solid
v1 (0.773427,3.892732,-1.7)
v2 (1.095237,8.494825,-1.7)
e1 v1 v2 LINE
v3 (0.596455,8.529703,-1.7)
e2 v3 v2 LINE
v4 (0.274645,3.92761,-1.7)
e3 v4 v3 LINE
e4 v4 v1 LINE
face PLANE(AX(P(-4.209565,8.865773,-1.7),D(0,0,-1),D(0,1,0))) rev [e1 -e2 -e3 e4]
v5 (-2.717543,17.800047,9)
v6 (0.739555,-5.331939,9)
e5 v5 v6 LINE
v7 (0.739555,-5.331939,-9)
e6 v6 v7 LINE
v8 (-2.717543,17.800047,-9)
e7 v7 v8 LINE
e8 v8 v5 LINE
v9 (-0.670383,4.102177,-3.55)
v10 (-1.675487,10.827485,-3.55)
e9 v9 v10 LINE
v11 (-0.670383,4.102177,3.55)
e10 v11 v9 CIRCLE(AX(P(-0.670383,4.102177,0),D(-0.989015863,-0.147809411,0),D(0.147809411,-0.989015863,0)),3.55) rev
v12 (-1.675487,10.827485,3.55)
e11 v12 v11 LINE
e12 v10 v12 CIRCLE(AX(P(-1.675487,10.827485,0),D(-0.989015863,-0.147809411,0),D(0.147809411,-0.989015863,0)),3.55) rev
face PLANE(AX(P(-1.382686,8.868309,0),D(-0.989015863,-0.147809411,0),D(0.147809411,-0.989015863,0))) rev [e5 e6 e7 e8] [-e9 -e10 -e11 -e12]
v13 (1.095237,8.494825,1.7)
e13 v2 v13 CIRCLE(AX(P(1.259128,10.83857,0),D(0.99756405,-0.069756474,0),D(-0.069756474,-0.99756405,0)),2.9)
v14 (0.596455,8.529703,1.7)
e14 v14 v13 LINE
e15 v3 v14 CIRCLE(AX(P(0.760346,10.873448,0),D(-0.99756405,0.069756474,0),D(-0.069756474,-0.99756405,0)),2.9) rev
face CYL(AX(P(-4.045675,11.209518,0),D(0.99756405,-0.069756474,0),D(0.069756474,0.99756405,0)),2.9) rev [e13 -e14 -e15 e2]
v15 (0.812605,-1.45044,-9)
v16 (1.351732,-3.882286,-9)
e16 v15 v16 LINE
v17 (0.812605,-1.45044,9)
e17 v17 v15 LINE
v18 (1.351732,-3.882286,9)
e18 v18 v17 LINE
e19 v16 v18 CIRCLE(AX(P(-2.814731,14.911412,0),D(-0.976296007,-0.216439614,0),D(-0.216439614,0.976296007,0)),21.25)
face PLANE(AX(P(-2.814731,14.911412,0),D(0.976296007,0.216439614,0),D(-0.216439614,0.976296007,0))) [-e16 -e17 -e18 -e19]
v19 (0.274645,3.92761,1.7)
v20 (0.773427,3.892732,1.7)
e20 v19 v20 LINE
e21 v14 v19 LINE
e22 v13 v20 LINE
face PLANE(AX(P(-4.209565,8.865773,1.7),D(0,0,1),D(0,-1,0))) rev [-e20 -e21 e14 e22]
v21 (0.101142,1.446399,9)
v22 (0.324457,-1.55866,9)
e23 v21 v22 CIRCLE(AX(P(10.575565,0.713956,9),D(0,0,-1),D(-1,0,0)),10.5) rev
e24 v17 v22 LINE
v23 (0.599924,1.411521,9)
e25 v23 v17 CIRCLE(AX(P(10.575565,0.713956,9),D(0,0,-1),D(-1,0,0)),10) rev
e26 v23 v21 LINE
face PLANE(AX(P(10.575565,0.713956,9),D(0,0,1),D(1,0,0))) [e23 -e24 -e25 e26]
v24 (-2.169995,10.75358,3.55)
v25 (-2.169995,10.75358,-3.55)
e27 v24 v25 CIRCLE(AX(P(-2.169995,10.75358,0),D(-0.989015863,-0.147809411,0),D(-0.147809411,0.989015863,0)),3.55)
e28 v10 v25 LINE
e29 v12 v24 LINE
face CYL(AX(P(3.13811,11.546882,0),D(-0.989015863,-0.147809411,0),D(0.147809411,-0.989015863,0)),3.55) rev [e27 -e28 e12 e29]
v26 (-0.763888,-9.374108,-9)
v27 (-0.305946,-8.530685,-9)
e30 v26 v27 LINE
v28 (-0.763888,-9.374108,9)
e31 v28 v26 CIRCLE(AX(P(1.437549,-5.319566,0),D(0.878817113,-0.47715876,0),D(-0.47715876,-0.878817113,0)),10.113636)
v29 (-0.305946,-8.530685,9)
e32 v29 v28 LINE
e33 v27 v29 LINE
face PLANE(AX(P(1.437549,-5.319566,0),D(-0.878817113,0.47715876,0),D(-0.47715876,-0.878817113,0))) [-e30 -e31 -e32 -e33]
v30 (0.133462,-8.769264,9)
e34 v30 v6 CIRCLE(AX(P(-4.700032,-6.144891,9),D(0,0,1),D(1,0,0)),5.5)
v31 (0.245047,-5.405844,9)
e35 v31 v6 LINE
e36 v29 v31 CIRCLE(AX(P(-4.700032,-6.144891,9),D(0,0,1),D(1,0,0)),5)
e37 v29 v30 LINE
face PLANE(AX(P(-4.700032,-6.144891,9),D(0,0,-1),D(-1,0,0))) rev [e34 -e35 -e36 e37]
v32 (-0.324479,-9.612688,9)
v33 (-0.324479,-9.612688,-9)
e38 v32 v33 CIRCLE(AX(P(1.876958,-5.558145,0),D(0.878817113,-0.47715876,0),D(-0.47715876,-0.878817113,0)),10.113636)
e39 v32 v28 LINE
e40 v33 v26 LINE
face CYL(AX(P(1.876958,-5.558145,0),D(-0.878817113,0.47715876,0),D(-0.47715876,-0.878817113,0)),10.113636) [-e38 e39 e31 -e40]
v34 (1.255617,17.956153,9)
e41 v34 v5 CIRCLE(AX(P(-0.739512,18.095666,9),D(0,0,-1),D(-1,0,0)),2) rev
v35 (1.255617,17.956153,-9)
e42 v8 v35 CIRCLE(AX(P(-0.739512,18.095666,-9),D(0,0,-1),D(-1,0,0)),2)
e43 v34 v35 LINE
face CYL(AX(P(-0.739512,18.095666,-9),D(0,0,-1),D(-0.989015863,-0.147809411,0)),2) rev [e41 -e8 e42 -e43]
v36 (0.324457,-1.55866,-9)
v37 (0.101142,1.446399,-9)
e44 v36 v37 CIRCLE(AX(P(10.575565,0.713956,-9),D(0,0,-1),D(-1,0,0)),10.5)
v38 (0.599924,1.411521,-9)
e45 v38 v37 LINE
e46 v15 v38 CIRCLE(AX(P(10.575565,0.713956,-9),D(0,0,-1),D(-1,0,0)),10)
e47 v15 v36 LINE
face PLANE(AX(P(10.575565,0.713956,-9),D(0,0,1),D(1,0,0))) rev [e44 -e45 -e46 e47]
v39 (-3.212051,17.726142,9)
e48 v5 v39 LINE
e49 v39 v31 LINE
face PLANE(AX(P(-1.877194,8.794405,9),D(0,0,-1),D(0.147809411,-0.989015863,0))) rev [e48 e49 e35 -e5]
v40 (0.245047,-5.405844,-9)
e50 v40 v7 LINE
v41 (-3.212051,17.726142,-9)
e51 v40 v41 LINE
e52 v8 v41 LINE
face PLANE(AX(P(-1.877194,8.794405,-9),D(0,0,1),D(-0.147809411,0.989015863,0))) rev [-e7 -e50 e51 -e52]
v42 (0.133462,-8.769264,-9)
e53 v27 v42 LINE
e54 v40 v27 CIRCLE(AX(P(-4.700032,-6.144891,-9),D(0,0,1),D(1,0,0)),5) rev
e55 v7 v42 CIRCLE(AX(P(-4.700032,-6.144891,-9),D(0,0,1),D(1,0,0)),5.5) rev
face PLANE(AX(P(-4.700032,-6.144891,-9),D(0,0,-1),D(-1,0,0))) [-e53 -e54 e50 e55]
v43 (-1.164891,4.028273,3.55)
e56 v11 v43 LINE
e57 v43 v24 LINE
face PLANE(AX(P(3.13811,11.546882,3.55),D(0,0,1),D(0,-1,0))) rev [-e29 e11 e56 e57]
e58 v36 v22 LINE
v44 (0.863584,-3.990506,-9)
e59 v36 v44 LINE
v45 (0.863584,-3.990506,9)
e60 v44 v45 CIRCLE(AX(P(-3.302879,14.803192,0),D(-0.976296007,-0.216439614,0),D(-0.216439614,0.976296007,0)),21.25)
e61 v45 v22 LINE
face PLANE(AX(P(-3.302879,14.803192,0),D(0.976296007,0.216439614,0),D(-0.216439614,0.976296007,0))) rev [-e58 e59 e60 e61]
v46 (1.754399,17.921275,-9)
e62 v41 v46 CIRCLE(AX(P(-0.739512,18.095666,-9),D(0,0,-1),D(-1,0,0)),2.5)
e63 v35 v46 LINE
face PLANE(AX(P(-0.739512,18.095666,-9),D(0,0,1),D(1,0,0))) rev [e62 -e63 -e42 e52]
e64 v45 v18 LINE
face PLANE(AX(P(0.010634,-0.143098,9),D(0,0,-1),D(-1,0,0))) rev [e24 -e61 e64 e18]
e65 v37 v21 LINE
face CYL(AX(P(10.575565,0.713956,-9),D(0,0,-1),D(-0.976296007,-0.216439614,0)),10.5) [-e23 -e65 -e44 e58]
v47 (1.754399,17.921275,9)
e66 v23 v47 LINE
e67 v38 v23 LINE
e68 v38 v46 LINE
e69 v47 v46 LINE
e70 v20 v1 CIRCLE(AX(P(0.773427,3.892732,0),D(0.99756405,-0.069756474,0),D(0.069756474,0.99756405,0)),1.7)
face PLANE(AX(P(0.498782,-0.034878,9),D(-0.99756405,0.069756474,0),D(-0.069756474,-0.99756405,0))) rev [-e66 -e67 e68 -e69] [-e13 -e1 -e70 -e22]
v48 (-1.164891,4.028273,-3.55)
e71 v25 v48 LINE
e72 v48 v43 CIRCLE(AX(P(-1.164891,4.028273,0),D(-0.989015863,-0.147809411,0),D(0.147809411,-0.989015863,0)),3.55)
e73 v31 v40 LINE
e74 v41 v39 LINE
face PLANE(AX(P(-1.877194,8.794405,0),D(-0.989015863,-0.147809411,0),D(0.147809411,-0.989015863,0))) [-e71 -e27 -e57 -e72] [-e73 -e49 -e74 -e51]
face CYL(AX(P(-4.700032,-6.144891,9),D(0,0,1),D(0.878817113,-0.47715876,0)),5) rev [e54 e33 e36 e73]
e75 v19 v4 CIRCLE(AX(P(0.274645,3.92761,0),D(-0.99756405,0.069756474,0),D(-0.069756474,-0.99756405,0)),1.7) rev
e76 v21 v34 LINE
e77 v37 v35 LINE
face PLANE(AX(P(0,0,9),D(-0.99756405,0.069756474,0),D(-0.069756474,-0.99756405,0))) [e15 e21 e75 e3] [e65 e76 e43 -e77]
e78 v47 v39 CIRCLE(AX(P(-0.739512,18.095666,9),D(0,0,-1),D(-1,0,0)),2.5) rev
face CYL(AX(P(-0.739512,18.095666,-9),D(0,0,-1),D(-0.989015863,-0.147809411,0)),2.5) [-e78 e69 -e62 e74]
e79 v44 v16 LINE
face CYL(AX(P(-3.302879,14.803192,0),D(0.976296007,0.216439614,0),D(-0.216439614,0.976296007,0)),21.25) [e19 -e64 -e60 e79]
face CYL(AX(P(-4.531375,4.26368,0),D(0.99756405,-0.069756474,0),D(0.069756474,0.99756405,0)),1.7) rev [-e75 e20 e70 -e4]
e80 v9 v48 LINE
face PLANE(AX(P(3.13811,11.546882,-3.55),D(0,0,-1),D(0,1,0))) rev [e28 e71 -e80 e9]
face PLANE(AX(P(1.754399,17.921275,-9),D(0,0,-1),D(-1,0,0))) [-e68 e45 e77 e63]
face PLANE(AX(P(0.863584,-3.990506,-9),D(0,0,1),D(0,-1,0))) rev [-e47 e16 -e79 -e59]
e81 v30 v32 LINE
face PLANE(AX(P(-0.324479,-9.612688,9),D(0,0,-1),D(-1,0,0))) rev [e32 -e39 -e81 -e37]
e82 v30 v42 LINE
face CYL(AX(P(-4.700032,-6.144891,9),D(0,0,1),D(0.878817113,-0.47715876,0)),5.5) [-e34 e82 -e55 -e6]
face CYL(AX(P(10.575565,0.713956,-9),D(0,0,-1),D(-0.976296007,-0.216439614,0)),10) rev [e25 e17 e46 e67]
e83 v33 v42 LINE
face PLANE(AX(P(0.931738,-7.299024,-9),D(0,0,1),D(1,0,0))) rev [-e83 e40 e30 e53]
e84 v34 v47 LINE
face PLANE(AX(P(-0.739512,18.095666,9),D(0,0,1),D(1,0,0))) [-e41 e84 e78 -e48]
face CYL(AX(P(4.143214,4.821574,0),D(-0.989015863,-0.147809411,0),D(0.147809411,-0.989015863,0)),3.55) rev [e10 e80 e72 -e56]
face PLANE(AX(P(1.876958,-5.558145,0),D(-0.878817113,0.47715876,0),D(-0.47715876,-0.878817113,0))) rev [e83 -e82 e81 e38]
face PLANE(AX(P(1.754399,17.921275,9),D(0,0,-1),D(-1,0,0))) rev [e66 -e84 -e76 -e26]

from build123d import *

# Parameters (mm, degrees)
TABAN_FLAN_1_DEPTH           = 9
KENAR_FLAN_1_STRIP_CUT_DEPTH = 18
KENAR_FLAN_1_DEPTH           = 18
KENAR_FLAN_1_START           = 0.5
KENAR_FLAN_1_FLAT_DEPTH      = 0.5
DIKI_1_START                 = -9
DIKI_1_DEPTH                 = 18
IZIM24_W                     = 18
IZIM24_H                     = 7
SEKME3_DEPTH                 = 0.5
KENAR_FLAN_2_STRIP_CUT_DEPTH = 18
KENAR_FLAN_2_DEPTH           = 18
KENAR_FLAN_2_START           = 0.5
KENAR_FLAN_2_FLAT_DEPTH      = 0.5
KES_EKSTR_ZYON1_REACH        = 24.729
KES_EKSTR_ZYON2_REACH        = 24.841


# Read off the part's stored shape, not the designer's step: Dikiş1
# Sheet-metal steps are written as plain solids
with BuildPart() as part:
    # Çizim1 → Taban-Flanş1 (new, symmetric)
    with BuildSketch(Plane.XY):
        Polygon((0, 0), (1.255616527, 17.956152905), (1.754398553, 17.921274668), (0.498782025, -0.034878237), align=None)
    extrude(amount=TABAN_FLAN_1_DEPTH, both=True)

    # Kenar-Flanş1 strip (across the edge) → Kenar-Flanş1 strip cut (cut)
    with BuildSketch(Plane(origin=(0.498782025, -0.034878237, 9), x_dir=(0.9762960071199348, 0.2164396139380966, 0), z_dir=(0, 0, -1))):
        Polygon((-6.3159448, 19.561804043), (-0.067607216, -1.532230124), (0.411802651, -1.390222452), (-5.836534932, 19.703811715), align=None)
    extrude(amount=KENAR_FLAN_1_STRIP_CUT_DEPTH, mode=Mode.SUBTRACT)

    # Kenar-Flanş1 bend section (across the edge) → Kenar-Flanş1 (add)
    with BuildSketch(Plane(origin=(0.498782025, -0.034878237, 9), x_dir=(0.9762960071199348, 0.2164396139380966, 0), z_dir=(0, 0, -1))):
        with BuildLine():
            Line((-0.5, 1.449930995), (0, 1.449930995))
            ThreePointArc((0, 1.449930995), (0.103486132, 0.015004775), (0.411802651, -1.390222452))
            Line((0.411802651, -1.390222452), (-0.067607216, -1.532230124))
            ThreePointArc((-0.067607216, -1.532230124), (-0.391339562, -0.056741536), (-0.5, 1.449930995))
        make_face()
    extrude(amount=KENAR_FLAN_1_DEPTH)

    # Kenar-Flanş1 profile (on flange) → Kenar-Flanş1 flat (add)
    with BuildSketch(Plane(origin=(0.498782025, -0.034878237, 0), x_dir=(0, 0, -1), z_dir=(-0.9762960071199348, -0.2164396139380966, 0)).offset(KENAR_FLAN_1_START)):
        with BuildLine():
            ThreePointArc((9, 3.9408211), (0, 5.9408211), (-9, 3.9408211))
            Line((-9, 3.9408211), (-9, 1.449930995))
            Line((-9, 1.449930995), (9, 1.449930995))
            Line((9, 1.449930995), (9, 3.9408211))
        make_face()
    extrude(amount=-KENAR_FLAN_1_FLAT_DEPTH)

    # Dikiş1 outline → Dikiş1 (add)
    with BuildSketch(Plane.XY.offset(DIKI_1_START)):
        with BuildLine():
            Line((-0.542336916, -0.13733327), (-0.047828985, -0.063428564))
            Line((-0.047828985, -0.063428564), (-2.7175433, 17.80004703))
            ThreePointArc((-2.7175433, 17.80004703), (-0.818031205, 20.094123925), (1.255616527, 17.956152905))
            Line((1.255616527, 17.956152905), (1.754398553, 17.921274668))
            ThreePointArc((1.754398553, 17.921274668), (-0.837661113, 20.593738443), (-3.212051232, 17.726142324))
            Line((-3.212051232, 17.726142324), (-0.542336916, -0.13733327))
        make_face()
    extrude(amount=DIKI_1_DEPTH)

    # Çizim24 → Sekme3 (add)
    with BuildSketch(Plane(origin=(-0.550564326, -0.08228239, 0), x_dir=(0, 0, 1), z_dir=(-0.989015863361916, -0.1478094111296166, 0))):
        with Locations((0, -3.555662282)):
            Rectangle(IZIM24_W, IZIM24_H)
    extrude(amount=-SEKME3_DEPTH)

    # Kenar-Flanş2 strip (across the edge) → Kenar-Flanş2 strip cut (cut)
    with BuildSketch(Plane(origin=(0.492328961, -7.060444313, -9), x_dir=(-0.8788171126619707, 0.4771587602595987, 0), z_dir=(0, 0, 1))):
        Polygon((-6.614275583, 7.946620091), (0.607504695, -1.63700603), (1.00682245, -1.336098518), (-6.214957828, 8.247527602), align=None)
    extrude(amount=KENAR_FLAN_2_STRIP_CUT_DEPTH, mode=Mode.SUBTRACT)

    # Kenar-Flanş2 bend section (across the edge) → Kenar-Flanş2 (add)
    with BuildSketch(Plane(origin=(0.492328961, -7.060444313, -9), x_dir=(-0.8788171126619707, 0.4771587602595987, 0), z_dir=(0, 0, 1))):
        with BuildLine():
            Line((-0.5, 1.672976598), (0, 1.672976598))
            ThreePointArc((0, 1.672976598), (0.258381724, 0.086453315), (1.00682245, -1.336098518))
            Line((1.00682245, -1.336098518), (0.607504695, -1.63700603))
            ThreePointArc((0.607504695, -1.63700603), (-0.215780104, -0.072199013), (-0.5, 1.672976598))
        make_face()
    extrude(amount=KENAR_FLAN_2_DEPTH)

    # Kenar-Flanş2 profile (on flange) → Kenar-Flanş2 flat (add)
    with BuildSketch(Plane(origin=(0.492328961, -7.060444313, 0), x_dir=(0, 0, 1), z_dir=(0.8788171126619707, -0.4771587602595987, 0)).offset(KENAR_FLAN_2_START)):
        with BuildLine():
            ThreePointArc((9, 2.63270234), (0, 8.13270234), (-9, 2.63270234))
            Line((-9, 2.63270234), (-9, 1.672976598))
            Line((-9, 1.672976598), (9, 1.672976598))
            Line((9, 1.672976598), (9, 2.63270234))
        make_face()
    extrude(amount=-KENAR_FLAN_2_FLAT_DEPTH)

    # Çizim31 → Kes-Ekstrüzyon1 (cut, up to next)
    with BuildSketch(Plane(origin=(-0.550564326, -0.08228239, 0), x_dir=(0, 0, 1), z_dir=(-0.9890158633619159, -0.1478094111296166, 0)), mode=Mode.PRIVATE) as kes_ekstr_zyon1_sk1:
        with BuildLine():
            Line((-3.55, 10.956207356), (-3.55, 4.156207356))
            ThreePointArc((-3.55, 4.156207356), (0, 0.606207356), (3.55, 4.156207356))
            Line((3.55, 4.156207356), (3.55, 10.956207356))
            ThreePointArc((3.55, 10.956207356), (0, 14.506207356), (-3.55, 10.956207356))
        make_face()
    kes_ekstr_zyon1_tool1 = extrude(kes_ekstr_zyon1_sk1.sketch, amount=-KES_EKSTR_ZYON1_REACH, mode=Mode.PRIVATE) & part.part
    add(kes_ekstr_zyon1_tool1.solids().sort_by_distance((-1.667443, 7.390927, 0))[0], mode=Mode.SUBTRACT)

    # Çizim32 → Kes-Ekstrüzyon2 (cut, up to next)
    with BuildSketch(Plane(origin=(0.498782025, -0.034878237, 0), x_dir=(0, 0, -1), z_dir=(0.9975640502598243, -0.06975647374412548, 0)), mode=Mode.PRIVATE) as kes_ekstr_zyon2_sk1:
        with BuildLine():
            Line((1.7, 8.550531975), (1.7, 3.937201267))
            ThreePointArc((1.7, 3.937201267), (0, 2.237201267), (-1.7, 3.937201267))
            Line((-1.7, 3.937201267), (-1.7, 8.550531975))
            ThreePointArc((-1.7, 8.550531975), (0, 13.8), (1.7, 8.550531975))
        make_face()
    kes_ekstr_zyon2_tool1 = extrude(kes_ekstr_zyon2_sk1.sketch, amount=-KES_EKSTR_ZYON2_REACH, mode=Mode.PRIVATE) & part.part
    add(kes_ekstr_zyon2_tool1.solids().sort_by_distance((1.098249, 8.537894, 0))[0], mode=Mode.SUBTRACT)


solid = part.part
